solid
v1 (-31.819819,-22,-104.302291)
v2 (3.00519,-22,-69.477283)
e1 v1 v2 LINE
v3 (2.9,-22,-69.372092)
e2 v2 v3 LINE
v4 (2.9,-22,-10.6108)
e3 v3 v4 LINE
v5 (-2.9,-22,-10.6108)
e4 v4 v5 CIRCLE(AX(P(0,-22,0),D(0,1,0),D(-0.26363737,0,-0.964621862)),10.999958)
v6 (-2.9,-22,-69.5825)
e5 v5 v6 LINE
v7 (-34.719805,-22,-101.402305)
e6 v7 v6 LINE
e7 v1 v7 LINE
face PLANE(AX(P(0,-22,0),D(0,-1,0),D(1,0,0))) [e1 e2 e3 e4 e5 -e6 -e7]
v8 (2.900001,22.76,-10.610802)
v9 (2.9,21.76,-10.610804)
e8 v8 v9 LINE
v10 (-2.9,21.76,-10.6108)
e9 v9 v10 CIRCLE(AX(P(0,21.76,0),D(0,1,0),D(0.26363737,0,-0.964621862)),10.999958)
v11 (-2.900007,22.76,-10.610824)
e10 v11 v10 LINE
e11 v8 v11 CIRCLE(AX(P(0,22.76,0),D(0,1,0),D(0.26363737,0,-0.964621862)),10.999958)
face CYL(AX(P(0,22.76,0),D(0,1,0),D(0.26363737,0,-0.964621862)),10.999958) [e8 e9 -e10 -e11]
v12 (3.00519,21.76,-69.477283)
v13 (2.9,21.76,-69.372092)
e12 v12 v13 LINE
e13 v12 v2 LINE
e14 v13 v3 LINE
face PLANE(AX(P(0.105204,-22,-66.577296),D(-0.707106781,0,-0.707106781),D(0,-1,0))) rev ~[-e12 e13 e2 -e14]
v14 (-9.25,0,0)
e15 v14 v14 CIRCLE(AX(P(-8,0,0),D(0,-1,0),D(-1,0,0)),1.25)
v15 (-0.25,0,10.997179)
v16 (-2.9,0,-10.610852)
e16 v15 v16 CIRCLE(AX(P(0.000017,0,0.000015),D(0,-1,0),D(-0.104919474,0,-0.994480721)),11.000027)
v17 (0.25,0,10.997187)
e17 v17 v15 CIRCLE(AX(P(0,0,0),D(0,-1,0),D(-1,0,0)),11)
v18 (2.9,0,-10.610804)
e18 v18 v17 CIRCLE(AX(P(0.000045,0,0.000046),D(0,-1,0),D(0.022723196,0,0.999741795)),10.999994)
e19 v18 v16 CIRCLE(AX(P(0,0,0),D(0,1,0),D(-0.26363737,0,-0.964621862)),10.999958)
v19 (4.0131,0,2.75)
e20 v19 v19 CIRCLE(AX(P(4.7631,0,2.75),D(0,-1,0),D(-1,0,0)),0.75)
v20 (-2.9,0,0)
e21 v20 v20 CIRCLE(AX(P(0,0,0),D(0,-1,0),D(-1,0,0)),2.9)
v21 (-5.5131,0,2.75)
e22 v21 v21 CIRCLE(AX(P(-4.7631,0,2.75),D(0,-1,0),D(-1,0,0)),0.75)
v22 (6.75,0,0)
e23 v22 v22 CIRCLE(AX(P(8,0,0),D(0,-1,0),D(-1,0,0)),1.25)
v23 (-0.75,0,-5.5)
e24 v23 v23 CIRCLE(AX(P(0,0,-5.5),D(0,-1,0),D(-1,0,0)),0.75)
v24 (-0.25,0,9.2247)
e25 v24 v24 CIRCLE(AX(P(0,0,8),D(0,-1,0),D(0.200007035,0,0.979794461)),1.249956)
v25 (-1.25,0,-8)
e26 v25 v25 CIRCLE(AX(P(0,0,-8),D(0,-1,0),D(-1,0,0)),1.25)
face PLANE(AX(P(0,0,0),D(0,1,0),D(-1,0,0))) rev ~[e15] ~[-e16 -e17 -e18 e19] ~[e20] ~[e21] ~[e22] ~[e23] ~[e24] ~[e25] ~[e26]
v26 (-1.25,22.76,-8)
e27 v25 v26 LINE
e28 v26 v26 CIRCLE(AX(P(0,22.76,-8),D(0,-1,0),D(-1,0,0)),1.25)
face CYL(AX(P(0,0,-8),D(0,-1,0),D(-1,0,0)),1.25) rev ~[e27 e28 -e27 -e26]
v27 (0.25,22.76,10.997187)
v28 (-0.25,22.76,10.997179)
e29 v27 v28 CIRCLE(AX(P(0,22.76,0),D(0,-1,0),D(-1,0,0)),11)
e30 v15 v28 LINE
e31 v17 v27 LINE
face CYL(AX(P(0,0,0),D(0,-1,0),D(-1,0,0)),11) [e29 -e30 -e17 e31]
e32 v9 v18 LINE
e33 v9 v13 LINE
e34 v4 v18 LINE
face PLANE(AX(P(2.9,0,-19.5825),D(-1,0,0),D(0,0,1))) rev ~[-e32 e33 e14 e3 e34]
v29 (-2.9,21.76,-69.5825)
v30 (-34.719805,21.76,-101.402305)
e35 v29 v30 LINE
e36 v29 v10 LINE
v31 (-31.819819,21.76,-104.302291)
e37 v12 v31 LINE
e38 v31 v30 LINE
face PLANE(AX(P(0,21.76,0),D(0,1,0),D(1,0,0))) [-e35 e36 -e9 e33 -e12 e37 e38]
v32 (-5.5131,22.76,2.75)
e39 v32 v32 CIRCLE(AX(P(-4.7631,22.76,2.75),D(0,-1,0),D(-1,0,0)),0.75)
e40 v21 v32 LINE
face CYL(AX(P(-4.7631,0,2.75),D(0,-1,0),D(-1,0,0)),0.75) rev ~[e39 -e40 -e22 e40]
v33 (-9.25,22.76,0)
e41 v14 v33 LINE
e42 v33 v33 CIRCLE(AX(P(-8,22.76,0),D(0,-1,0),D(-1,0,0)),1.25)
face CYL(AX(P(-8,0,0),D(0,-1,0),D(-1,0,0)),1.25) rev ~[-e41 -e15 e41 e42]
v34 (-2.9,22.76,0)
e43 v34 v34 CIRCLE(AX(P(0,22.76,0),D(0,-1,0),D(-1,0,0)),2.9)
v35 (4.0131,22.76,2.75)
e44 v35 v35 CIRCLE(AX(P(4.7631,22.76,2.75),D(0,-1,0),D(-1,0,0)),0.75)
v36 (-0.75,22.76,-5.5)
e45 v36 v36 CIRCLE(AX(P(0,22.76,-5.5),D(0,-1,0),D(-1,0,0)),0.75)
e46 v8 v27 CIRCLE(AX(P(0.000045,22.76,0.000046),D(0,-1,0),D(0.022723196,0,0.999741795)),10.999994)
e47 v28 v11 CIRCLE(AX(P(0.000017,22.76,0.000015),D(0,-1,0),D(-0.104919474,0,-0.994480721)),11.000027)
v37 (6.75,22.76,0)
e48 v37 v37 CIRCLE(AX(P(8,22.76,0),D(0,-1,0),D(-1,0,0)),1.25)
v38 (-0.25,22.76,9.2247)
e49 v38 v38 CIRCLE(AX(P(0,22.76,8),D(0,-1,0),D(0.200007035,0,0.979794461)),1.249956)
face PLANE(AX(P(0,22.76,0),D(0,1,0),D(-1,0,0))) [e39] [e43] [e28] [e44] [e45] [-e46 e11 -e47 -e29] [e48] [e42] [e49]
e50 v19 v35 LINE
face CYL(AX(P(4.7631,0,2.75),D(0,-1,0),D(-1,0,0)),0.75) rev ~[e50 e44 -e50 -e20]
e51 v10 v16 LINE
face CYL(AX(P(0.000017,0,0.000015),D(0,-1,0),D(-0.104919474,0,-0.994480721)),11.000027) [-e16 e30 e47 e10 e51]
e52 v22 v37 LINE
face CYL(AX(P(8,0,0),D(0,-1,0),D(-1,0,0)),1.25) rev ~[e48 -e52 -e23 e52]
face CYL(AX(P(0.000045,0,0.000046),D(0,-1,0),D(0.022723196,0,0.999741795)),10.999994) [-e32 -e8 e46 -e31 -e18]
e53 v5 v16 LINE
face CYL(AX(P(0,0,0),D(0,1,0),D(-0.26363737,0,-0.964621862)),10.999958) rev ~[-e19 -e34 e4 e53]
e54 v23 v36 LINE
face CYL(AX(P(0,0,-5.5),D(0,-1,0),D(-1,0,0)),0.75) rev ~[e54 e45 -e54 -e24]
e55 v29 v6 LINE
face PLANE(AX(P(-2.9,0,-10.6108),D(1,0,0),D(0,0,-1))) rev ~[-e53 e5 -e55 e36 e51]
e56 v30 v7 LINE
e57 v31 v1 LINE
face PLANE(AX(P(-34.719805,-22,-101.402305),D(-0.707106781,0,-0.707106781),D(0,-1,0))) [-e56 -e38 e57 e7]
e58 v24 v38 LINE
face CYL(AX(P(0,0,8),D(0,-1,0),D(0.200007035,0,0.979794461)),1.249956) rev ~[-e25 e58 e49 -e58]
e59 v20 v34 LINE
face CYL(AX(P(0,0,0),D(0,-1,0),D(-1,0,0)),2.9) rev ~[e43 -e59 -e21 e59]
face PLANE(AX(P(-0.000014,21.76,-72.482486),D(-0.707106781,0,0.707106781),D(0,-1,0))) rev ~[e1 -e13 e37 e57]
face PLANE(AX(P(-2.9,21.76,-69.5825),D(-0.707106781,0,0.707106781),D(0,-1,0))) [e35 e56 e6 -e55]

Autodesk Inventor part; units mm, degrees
ref_plane "YZ Plane" through (0, 0, 0) normal (1, 0, 0) x (0, 1, 0)
ref_plane "XZ Plane" through (0, 0, 0) normal (0, 1, 0) x (-1, 0, 0)
sketch "Эскиз1" plane through (0, 0, 0) normal (0, 1, 0) x (-1, 0, 0)
  arc A0 (-0.25, 9.2247) -> (0.25, 9.2247) centre (0, 8) ccw
  line L0 (-0.25, 10.9972) -> (-0.25, 9.2247)
  arc A1 (-0.25, 10.9972) -> (-1.1469, -10.94) centre (0, 0) ccw
  line L1 (-1.1469, -10.6297) -> (-1.1469, -10.94)
  line L2 (-0.8473, -10.6297) -> (-1.1469, -10.6297)
  line L3 (-0.8473, -10.9673) -> (-0.8473, -10.6297)
  arc A2 (-0.8473, -10.9673) -> (0.8535, -10.9668) centre (0, 0) ccw
  line L4 (0.8535, -10.6297) -> (0.8535, -10.9668)
  line L5 (1.1541, -10.6297) -> (0.8535, -10.6297)
  line L6 (1.1541, -10.9393) -> (1.1541, -10.6297)
  arc A3 (1.1541, -10.9393) -> (0.25, 10.9972) centre (0, 0) ccw
  line L7 (0.25, 9.2247) -> (0.25, 10.9972)
  circle A4 centre (8, 0) radius 1.25
  circle A5 centre (0, -8) radius 1.25
  circle A6 centre (-8, 0) radius 1.25
  circle A7 centre (0, -5.5) radius 0.75
  circle A8 centre (4.7631, 2.75) radius 0.75
  circle A9 centre (-4.7631, 2.75) radius 0.75
  circle A10 centre (0, 0) radius 2.9
  arc A11 (0.25, 9.2247) -> (-0.25, 9.2247) centre (0, 8) ccw
  circle A12 centre (0, 0) radius 11
extrude "Выдавливание1" add sketch "Эскиз1" along normal blind 22.76 contours A0 L7 A3 L6 L5 L4 A2 L3 L2 L1 A1 L0 | L0 A12 L7 A11 | L1 L2 L3 A12 | A12 L4 L5 L6
sketch "Эскиз2" plane through (0, 22.76, 0) normal (0, 1, 0) x (1, 0, 0)
  circle A0 centre (0, 0) radius 2.9 projected
  line L0 (-2.9, 0) -> (2.9, 0)
  line L1 (2.9, 0) -> (2.9, 19.5825)
  line L2 (2.9, 19.5825) -> (-2.9, 19.5825)
  line L3 (-2.9, 19.5825) -> (-2.9, 0)
  circle A1 centre (0, 0) radius 11 projected
  arc A2 (2.9, 10.6108) -> (-2.9, 10.6108) centre (0, 0) ccw
extrude "Выдавливание2" add sketch "Эскиз2" against normal blind 22.76 contours A1 L3 L2 L1
sketch "Эскиз3" plane through (0, 22.76, 0) normal (0, 1, 0) x (1, 0, 0)
  line L0 (2.9, 19.5825) -> (2.9, 10.6108) projected
  arc A0 (2.9, 10.6108) -> (-2.9, 10.6108) centre (0, 0) ccw
  line L1 (-2.9, 19.5825) -> (-2.9, 10.6108) projected
  line L2 (-2.9, 10.6108) -> (2.9, 10.6108)
  line L3 (2.9, 10.6108) -> (2.9, 19.5825)
  line L4 (2.9, 19.5825) -> (-2.9, 19.5825)
  line L5 (-2.9, 19.5825) -> (-2.9, 10.6108)
  point P0 (0, 0)
extrude "Выдавливание3" cut sketch "Эскиз3" against normal blind 1 contours L0 A0 L1 L4
sketch "Эскиз4" plane through (0, 0, 0) normal (0, -1, 0) x (1, 0, 0)
  arc A0 (-2.9, -10.6108) -> (2.9, -10.6108) centre (0, 0) ccw projected
  arc A1 (-2.9, -10.6108) -> (2.9, -10.6108) centre (0, 0) ccw
  line L0 (-2.9, -10.6108) -> (-2.9, -19.5825) projected
  line L1 (2.9, -10.6108) -> (-2.9, -10.6108)
  line L2 (-2.9, -10.6108) -> (-2.9, -19.5825)
  line L3 (-2.9, -19.5825) -> (2.9, -19.5825)
  line L4 (2.9, -19.5825) -> (2.9, -10.6108)
  point P0 (0, 0)
extrude "Выдавливание4" add sketch "Эскиз4" along normal blind 22 contours A0 L4 L3 L0
move faces "Перенос1" translate (0, 0, -50) faces at (-0.9667, 7.1733, -19.5825)
ref_plane "РабПлоскость1" through (-2.9, -22, -69.5825) normal (-0.7071068, 0, -0.7071068) x (0, -1, 0)
sketch "Эскиз5" plane through (-2.9, -22, -69.5825) normal (-0.7071068, 0, -0.7071068) x (0, -1, 0)
  line L0 (-43.76, 0) -> (0, 0) projected
  line L1 (-43.76, -4.1012) -> (-43.76, 37.598) projected
  line L2 (0, 0) -> (-43.76, 0)
  line L3 (-43.76, 0) -> (-43.76, -4.1012)
  line L4 (-43.76, -4.1012) -> (0, -4.1012)
  line L5 (0, -4.1012) -> (0, 0)
  point P0 (-22, 47.1516)
extrude "Выдавливание5" add sketch "Эскиз5" along normal blind 45 and the other way blind 4.25
properties part number "палец"
